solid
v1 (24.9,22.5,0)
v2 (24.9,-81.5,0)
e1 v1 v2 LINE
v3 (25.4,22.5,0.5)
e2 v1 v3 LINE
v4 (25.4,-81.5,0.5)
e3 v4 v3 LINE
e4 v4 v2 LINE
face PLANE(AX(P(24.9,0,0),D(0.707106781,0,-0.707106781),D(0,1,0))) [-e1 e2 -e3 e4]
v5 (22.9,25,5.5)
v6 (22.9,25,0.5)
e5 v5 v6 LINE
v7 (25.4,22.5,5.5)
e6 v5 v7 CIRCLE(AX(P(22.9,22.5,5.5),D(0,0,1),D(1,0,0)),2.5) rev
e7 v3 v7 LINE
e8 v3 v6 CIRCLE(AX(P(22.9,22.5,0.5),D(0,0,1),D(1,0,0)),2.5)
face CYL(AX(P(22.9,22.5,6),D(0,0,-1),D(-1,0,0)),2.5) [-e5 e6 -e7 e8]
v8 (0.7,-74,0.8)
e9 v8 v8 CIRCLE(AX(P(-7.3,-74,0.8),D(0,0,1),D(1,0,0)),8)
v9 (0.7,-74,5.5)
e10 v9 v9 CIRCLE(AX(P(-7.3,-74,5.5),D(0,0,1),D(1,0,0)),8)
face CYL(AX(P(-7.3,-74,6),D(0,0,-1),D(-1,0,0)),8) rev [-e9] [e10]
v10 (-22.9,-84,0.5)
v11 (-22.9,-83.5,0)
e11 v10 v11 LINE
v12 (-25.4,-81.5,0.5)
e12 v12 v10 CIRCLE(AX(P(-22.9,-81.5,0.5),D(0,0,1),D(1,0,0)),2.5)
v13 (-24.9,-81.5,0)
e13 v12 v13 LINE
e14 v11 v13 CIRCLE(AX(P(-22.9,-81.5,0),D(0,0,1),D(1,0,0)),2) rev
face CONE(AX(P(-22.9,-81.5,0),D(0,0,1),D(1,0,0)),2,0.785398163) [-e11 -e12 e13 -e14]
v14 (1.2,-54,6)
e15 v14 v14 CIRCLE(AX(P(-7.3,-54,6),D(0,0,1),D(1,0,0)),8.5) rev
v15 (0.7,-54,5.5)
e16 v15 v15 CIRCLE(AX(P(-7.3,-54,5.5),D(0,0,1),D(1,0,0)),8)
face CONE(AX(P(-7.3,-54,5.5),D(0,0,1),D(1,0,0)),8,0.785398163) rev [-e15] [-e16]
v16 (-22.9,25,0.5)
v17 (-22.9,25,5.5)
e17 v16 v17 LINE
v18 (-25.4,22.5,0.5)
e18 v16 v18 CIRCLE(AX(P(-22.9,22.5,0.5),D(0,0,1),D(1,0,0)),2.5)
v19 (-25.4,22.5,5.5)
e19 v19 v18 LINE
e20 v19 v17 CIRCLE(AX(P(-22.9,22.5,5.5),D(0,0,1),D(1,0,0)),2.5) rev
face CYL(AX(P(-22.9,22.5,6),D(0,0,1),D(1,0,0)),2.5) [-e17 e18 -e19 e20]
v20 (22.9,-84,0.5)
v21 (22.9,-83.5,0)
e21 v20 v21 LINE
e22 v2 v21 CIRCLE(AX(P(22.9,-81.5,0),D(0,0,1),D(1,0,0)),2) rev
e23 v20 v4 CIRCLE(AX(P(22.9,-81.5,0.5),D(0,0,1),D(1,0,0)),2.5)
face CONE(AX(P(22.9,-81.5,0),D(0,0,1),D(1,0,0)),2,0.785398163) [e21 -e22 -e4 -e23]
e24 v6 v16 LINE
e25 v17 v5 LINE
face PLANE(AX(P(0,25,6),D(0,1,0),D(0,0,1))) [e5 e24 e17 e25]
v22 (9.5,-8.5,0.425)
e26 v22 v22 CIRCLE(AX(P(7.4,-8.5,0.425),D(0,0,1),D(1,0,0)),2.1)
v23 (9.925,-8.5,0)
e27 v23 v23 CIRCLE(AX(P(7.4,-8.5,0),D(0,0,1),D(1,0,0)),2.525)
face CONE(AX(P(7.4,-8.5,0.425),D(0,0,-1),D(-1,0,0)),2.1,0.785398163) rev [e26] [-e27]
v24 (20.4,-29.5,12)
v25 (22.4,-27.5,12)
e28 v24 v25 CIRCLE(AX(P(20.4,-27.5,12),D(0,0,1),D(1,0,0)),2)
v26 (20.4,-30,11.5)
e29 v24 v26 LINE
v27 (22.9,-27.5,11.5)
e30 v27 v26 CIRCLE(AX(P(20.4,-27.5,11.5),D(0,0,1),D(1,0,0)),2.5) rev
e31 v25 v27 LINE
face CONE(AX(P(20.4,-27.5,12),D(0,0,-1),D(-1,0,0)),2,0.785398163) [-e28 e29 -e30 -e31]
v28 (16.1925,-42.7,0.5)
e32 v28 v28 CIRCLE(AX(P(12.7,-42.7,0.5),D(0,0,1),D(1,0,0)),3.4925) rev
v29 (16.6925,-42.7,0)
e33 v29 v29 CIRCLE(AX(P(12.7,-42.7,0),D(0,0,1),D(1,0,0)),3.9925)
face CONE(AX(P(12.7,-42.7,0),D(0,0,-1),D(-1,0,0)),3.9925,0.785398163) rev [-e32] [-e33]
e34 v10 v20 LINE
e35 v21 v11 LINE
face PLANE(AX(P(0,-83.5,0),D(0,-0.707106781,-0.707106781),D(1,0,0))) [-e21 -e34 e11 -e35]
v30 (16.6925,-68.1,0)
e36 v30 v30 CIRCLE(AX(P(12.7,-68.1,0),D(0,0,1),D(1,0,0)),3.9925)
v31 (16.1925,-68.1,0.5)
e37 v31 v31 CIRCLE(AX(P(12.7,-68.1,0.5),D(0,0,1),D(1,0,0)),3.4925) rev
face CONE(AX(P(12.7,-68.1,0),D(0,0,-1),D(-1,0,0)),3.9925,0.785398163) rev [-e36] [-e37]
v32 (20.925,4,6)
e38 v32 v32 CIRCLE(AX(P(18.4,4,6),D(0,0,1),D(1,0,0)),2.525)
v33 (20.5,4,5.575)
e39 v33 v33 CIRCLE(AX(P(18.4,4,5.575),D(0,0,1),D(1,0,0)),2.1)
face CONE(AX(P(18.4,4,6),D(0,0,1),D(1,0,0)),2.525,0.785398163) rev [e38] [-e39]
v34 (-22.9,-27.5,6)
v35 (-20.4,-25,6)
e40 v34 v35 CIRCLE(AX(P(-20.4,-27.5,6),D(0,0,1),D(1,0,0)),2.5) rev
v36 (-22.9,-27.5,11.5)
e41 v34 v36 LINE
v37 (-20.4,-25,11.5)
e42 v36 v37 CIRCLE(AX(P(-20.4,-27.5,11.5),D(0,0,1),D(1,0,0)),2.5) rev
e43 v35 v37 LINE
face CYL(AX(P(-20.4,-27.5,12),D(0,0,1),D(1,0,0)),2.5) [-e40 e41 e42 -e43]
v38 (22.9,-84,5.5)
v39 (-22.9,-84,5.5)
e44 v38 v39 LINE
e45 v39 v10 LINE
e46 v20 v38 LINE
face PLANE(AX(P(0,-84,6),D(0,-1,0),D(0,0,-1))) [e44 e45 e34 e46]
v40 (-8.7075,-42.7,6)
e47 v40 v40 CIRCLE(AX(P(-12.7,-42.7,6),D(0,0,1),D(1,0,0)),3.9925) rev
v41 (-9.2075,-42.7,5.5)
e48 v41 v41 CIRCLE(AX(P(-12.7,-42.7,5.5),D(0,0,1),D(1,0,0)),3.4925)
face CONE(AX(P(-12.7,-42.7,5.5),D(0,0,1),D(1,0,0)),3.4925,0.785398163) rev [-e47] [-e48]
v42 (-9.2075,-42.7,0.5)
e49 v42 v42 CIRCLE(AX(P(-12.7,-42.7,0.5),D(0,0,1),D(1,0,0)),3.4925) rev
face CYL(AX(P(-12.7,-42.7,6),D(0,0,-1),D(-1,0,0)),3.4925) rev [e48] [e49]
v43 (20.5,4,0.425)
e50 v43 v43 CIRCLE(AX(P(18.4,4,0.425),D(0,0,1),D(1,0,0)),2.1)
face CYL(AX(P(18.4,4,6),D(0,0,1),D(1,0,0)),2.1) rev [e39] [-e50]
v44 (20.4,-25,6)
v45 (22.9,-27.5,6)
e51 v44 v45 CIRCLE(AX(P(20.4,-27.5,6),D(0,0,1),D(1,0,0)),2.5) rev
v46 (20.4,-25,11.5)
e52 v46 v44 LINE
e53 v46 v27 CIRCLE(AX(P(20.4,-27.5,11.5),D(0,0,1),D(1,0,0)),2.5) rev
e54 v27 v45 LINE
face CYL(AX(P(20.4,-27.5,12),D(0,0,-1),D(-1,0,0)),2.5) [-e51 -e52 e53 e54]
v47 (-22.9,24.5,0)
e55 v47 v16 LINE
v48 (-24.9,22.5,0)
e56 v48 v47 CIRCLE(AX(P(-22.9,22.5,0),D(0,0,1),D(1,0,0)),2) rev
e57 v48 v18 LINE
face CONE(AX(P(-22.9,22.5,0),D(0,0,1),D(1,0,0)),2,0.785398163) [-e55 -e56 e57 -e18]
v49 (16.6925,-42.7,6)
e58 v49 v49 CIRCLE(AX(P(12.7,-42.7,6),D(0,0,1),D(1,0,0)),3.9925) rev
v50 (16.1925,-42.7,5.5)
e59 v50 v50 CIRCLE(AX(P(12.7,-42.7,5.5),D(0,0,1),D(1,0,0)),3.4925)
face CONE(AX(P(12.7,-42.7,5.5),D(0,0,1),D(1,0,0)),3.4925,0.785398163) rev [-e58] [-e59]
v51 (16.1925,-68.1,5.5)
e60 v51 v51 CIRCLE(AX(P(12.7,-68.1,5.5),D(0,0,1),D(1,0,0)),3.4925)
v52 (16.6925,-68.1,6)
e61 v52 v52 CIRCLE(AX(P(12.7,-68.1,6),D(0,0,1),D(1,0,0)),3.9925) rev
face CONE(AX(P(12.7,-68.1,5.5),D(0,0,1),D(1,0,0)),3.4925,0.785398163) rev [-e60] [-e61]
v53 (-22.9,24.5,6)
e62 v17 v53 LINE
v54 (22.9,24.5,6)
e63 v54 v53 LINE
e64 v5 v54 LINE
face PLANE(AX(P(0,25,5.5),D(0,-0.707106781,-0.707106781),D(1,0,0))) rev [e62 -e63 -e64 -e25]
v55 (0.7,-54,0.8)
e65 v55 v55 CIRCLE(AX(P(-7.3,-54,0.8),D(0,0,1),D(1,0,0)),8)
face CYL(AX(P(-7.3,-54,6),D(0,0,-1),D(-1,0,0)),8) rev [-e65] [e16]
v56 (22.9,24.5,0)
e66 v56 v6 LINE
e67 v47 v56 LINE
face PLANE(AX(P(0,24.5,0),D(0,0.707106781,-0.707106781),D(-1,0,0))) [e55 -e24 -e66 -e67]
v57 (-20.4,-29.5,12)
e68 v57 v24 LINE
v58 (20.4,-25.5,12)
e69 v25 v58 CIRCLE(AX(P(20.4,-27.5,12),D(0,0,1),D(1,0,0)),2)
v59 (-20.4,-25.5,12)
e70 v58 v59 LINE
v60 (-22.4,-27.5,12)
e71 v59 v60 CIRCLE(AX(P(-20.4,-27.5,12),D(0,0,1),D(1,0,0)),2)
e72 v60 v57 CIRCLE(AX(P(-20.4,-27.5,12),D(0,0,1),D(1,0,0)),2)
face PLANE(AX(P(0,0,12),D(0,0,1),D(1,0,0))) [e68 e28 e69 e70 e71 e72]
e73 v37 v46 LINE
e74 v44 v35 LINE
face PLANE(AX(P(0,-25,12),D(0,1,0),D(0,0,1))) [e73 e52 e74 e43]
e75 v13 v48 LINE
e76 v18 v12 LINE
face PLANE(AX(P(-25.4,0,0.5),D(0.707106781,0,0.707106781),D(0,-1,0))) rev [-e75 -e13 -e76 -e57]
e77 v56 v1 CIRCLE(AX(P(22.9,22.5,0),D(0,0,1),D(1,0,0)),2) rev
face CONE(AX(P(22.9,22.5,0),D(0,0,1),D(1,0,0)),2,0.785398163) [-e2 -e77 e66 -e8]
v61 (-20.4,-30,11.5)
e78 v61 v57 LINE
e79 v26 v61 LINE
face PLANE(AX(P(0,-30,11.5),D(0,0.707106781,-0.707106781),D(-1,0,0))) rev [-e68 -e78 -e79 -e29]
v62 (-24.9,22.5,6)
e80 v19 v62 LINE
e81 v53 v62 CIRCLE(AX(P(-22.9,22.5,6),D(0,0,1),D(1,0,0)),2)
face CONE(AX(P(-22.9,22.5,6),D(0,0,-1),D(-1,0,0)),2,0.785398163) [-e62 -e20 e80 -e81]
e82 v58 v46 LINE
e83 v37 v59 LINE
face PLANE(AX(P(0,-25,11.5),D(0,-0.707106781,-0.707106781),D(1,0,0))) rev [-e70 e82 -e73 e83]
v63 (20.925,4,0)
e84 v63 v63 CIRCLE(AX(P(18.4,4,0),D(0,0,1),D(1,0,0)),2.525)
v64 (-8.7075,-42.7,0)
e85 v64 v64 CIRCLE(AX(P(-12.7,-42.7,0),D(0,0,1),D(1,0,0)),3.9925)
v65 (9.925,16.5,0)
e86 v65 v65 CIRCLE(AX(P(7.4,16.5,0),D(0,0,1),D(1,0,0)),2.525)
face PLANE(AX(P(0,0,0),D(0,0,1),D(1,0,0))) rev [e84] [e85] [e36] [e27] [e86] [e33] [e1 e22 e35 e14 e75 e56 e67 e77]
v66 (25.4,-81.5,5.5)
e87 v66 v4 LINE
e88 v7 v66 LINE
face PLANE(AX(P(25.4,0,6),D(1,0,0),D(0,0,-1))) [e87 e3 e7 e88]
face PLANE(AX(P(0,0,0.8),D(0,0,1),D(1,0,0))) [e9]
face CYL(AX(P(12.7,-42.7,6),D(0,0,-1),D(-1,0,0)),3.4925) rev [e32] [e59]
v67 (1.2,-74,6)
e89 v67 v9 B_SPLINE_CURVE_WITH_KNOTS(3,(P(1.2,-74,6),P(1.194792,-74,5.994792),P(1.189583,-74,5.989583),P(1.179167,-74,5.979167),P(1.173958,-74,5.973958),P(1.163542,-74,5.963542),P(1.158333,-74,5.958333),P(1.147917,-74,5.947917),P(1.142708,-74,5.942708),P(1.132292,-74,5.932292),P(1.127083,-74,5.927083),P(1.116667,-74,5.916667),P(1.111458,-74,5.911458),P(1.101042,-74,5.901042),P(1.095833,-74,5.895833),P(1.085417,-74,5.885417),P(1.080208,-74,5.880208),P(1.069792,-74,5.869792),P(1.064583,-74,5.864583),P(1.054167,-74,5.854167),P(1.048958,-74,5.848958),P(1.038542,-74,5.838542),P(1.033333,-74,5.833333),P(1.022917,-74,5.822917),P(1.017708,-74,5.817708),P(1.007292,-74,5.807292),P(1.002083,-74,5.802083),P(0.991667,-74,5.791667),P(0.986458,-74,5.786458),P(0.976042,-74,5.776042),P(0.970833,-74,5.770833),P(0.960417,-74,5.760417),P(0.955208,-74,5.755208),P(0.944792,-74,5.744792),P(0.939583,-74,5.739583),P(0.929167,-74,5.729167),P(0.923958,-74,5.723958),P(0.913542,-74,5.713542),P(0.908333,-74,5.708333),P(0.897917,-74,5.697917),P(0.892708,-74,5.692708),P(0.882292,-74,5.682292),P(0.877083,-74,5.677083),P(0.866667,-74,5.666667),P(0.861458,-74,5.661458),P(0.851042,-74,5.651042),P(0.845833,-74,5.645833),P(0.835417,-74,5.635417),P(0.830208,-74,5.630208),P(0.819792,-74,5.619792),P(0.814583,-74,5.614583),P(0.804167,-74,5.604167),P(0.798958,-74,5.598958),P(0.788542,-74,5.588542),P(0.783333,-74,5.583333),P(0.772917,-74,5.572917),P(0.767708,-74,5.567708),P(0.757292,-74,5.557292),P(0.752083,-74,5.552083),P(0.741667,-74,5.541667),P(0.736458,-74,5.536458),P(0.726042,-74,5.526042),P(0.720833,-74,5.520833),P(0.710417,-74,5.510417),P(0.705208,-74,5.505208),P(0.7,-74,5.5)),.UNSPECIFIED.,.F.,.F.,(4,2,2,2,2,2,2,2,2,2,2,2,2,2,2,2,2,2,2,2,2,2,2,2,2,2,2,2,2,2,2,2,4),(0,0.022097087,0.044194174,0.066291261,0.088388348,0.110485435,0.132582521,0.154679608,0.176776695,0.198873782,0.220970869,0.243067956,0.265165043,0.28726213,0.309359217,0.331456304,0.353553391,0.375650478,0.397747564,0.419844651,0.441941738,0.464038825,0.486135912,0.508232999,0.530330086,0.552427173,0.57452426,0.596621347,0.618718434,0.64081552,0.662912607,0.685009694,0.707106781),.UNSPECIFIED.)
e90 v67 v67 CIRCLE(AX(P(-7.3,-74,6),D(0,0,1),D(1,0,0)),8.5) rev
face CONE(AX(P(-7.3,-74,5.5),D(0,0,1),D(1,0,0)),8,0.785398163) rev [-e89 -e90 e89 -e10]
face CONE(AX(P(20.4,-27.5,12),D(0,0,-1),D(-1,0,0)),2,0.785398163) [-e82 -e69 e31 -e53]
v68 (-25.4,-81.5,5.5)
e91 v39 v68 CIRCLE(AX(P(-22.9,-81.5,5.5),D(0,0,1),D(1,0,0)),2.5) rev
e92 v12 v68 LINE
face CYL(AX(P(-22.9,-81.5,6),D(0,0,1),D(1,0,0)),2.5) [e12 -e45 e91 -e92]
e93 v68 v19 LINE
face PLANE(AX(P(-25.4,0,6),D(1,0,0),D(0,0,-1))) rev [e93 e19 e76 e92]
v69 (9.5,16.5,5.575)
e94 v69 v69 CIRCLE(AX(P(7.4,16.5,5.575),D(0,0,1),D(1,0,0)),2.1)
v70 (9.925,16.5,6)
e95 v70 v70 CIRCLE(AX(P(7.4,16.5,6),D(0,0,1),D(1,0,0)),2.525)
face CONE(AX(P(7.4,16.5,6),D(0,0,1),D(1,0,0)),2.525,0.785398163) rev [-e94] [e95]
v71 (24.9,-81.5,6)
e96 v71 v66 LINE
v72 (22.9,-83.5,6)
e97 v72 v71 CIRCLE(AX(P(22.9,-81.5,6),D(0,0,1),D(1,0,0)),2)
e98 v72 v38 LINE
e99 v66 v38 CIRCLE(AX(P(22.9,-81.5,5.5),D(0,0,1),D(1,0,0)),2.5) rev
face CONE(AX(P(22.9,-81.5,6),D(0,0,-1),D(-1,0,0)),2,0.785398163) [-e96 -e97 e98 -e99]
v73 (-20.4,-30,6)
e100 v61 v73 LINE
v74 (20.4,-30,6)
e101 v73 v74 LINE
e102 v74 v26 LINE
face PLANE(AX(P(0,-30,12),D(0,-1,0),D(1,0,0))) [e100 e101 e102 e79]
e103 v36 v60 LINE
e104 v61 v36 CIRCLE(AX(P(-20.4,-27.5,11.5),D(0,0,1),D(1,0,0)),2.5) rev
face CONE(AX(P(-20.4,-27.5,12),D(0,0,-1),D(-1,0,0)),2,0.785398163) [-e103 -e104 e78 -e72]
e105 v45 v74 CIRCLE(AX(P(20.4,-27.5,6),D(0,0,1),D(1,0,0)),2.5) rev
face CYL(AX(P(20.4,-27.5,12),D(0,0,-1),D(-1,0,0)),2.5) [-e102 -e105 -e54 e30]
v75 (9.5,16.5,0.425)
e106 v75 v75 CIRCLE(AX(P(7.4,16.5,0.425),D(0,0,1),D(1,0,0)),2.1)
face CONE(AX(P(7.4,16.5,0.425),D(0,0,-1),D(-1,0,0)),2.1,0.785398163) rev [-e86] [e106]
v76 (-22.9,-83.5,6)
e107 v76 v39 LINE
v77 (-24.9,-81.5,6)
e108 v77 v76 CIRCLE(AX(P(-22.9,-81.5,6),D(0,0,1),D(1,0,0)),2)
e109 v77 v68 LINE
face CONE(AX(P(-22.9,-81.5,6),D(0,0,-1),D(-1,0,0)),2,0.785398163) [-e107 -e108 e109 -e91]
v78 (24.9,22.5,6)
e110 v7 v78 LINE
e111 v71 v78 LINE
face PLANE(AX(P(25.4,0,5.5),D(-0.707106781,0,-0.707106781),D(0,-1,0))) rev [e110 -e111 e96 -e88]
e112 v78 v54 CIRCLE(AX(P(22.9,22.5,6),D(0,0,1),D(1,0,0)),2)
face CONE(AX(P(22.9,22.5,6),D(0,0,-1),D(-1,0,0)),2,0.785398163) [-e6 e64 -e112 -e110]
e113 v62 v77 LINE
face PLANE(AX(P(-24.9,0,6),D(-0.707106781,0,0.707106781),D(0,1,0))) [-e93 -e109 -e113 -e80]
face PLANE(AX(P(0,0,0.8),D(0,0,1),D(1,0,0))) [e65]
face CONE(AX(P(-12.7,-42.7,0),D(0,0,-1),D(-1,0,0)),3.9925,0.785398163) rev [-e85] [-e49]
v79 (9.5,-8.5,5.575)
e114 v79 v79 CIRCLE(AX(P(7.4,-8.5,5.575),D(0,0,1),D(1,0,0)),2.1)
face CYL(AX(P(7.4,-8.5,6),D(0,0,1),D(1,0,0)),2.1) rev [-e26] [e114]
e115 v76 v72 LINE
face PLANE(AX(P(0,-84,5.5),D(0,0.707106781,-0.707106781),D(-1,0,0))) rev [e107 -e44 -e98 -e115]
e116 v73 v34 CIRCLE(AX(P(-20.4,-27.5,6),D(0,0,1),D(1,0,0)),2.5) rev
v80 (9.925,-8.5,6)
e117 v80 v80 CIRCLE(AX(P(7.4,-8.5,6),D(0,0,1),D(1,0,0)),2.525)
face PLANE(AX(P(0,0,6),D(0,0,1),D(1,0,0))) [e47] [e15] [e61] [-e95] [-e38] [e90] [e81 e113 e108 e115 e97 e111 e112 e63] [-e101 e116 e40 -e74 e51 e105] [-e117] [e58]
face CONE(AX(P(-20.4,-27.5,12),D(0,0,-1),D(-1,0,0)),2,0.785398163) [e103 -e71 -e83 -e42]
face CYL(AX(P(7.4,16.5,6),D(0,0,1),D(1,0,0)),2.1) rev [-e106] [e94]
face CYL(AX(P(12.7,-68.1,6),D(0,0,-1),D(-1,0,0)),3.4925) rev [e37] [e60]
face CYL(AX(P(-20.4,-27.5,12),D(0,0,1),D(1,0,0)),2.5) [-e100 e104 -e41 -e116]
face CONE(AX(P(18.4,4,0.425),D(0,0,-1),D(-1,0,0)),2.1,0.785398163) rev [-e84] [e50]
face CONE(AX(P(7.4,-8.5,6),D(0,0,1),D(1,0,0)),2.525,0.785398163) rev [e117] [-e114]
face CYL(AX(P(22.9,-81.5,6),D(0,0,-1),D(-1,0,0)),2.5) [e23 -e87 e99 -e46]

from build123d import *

# Parameters (mm, degrees)
MAIN_FEATURES_SKETCH_W         = 50.8
MAIN_FEATURES_SKETCH_H         = 109
MAIN_FEATURES_SKETCH_R         = 3.4925
MAIN_FEATURES_SKETCH_R_2       = 8
MAIN_BODY_DEPTH                = 6
SKETCH1_5_W                    = 45.8
SKETCH1_5_H                    = 5
LEDGE_DEPTH                    = 12
SKETCH1_4_R                    = 8
SCREW_HEAD_RECESSES_DEPTH      = 0.8
M5X0_8_TAPPED_HOLE1_AT_2_COUNT = 2
M5X0_8_TAPPED_HOLE1_AT_2_PITCH = 25
M5X0_8_TAPPED_HOLE1_AT_3_COUNT = 2
M5X0_8_TAPPED_HOLE1_AT_3_PITCH = 16.650825805
FILLET1_R                      = 2.5
CHAMFER1_SIZE                  = 0.5


with BuildPart() as part:
    # main_features_sketch → main_body (new body)
    with BuildSketch(Plane.XY):
        with Locations((0, -29.5)):
            Rectangle(MAIN_FEATURES_SKETCH_W, MAIN_FEATURES_SKETCH_H)
        with Locations((12.7, -42.7)):
            Circle(MAIN_FEATURES_SKETCH_R, mode=Mode.SUBTRACT)
        with Locations((12.7, -68.1)):
            Circle(MAIN_FEATURES_SKETCH_R, mode=Mode.SUBTRACT)
        with Locations((-7.3, -54)):
            Circle(MAIN_FEATURES_SKETCH_R_2, mode=Mode.SUBTRACT)
        with Locations((-7.3, -74)):
            Circle(MAIN_FEATURES_SKETCH_R_2, mode=Mode.SUBTRACT)
        with Locations((-12.7, -42.7)):
            Circle(MAIN_FEATURES_SKETCH_R, mode=Mode.SUBTRACT)
    extrude(amount=MAIN_BODY_DEPTH)

    # Sketch1<5> → ledge (add)
    with BuildSketch(Plane.XY):
        with Locations((0, -27.5)):
            Rectangle(SKETCH1_5_W, SKETCH1_5_H)
    extrude(amount=LEDGE_DEPTH)

    # Sketch1<4> → screw_head_recesses (add)
    with BuildSketch(Plane.XY):
        with Locations((-7.3, -54)):
            Circle(SKETCH1_4_R)
        with Locations((-7.3, -74)):
            Circle(SKETCH1_4_R)
    extrude(amount=SCREW_HEAD_RECESSES_DEPTH)

    # Sketch3 → M5x0.8 Tapped Hole1 (revolve, cut)
    with BuildSketch(Plane(origin=(7.4, -8.5, 6), x_dir=(0, -1, 0), z_dir=(1, 0, 0))):
        Polygon((0, 0), (0, 6), (2.525, 6), (2.1, 5.575), (2.1, 0.425), (2.525, 0), align=None)
    m5x0_8_tapped_hole1 = revolve(axis=Axis((7.4, -8.5, 12.35), (0, 0, -1)), mode=Mode.SUBTRACT)

    # M5x0.8 Tapped Hole1 at 2: M5x0.8 Tapped Hole1 ×2
    with Locations(*[(0, i * M5X0_8_TAPPED_HOLE1_AT_2_PITCH, 0) for i in range(1, M5X0_8_TAPPED_HOLE1_AT_2_COUNT)]):
        add(m5x0_8_tapped_hole1, mode=Mode.SUBTRACT)

    # M5x0.8 Tapped Hole1 at 3: M5x0.8 Tapped Hole1 ×2
    with Locations(*[Vector(0.6606278948920246, 0.7507135169227555, 0) * (i * M5X0_8_TAPPED_HOLE1_AT_3_PITCH) for i in range(1, M5X0_8_TAPPED_HOLE1_AT_3_COUNT)]):
        add(m5x0_8_tapped_hole1, mode=Mode.SUBTRACT)

    # Fillet1
    fillet1_edges = [part.edges().sort_by_distance(p)[0] for p in [
        (25.4, 25, 3),
        (-25.4, 25, 3),
        (25.4, -84, 3),
        (-25.4, -84, 3),
        (22.9, -25, 9),
        (22.9, -30, 9),
        (-22.9, -25, 9),
        (-22.9, -30, 9),
    ]]
    fillet(fillet1_edges, radius=FILLET1_R - 0.0001)  # a hair under: the kernel refuses the full size

    # Chamfer1
    chamfer1_edges = [part.edges().sort_by_distance(p)[0] for p in [
        (0, 25, 0),
        (-24.667796242, 24.267796242, 0),
        (24.667796242, 24.267796242, 0),
        (-24.667796242, -83.267796242, 0),
        (24.667796242, -83.267796242, 0),
        (0, -84, 6),
        (0, 25, 6),
        (-25.4, -29.5, 6),
        (-24.667796242, 24.267796242, 6),
        (24.667796242, 24.267796242, 6),
        (-24.667796242, -83.267796242, 6),
        (24.667796242, -83.267796242, 6),
        (-16.1925, -42.7, 0),
        (9.2075, -42.7, 0),
        (9.2075, -68.1, 0),
        (9.2075, -68.1, 6),
        (-15.3, -74, 6),
        (-15.3, -54, 6),
        (9.2075, -42.7, 6),
        (-16.1925, -42.7, 6),
        (0, -25, 12),
        (0, -30, 12),
        (-22.167796242, -29.267796242, 12),
        (-22.167796242, -25.732203758, 12),
        (22.167796242, -29.267796242, 12),
        (22.167796242, -25.732203758, 12),
        (25.4, -29.5, 0),
        (25.4, -29.5, 6),
        (0, -84, 0),
        (-25.4, -29.5, 0),
    ]]
    chamfer(chamfer1_edges, length=CHAMFER1_SIZE)


solid = part.part
